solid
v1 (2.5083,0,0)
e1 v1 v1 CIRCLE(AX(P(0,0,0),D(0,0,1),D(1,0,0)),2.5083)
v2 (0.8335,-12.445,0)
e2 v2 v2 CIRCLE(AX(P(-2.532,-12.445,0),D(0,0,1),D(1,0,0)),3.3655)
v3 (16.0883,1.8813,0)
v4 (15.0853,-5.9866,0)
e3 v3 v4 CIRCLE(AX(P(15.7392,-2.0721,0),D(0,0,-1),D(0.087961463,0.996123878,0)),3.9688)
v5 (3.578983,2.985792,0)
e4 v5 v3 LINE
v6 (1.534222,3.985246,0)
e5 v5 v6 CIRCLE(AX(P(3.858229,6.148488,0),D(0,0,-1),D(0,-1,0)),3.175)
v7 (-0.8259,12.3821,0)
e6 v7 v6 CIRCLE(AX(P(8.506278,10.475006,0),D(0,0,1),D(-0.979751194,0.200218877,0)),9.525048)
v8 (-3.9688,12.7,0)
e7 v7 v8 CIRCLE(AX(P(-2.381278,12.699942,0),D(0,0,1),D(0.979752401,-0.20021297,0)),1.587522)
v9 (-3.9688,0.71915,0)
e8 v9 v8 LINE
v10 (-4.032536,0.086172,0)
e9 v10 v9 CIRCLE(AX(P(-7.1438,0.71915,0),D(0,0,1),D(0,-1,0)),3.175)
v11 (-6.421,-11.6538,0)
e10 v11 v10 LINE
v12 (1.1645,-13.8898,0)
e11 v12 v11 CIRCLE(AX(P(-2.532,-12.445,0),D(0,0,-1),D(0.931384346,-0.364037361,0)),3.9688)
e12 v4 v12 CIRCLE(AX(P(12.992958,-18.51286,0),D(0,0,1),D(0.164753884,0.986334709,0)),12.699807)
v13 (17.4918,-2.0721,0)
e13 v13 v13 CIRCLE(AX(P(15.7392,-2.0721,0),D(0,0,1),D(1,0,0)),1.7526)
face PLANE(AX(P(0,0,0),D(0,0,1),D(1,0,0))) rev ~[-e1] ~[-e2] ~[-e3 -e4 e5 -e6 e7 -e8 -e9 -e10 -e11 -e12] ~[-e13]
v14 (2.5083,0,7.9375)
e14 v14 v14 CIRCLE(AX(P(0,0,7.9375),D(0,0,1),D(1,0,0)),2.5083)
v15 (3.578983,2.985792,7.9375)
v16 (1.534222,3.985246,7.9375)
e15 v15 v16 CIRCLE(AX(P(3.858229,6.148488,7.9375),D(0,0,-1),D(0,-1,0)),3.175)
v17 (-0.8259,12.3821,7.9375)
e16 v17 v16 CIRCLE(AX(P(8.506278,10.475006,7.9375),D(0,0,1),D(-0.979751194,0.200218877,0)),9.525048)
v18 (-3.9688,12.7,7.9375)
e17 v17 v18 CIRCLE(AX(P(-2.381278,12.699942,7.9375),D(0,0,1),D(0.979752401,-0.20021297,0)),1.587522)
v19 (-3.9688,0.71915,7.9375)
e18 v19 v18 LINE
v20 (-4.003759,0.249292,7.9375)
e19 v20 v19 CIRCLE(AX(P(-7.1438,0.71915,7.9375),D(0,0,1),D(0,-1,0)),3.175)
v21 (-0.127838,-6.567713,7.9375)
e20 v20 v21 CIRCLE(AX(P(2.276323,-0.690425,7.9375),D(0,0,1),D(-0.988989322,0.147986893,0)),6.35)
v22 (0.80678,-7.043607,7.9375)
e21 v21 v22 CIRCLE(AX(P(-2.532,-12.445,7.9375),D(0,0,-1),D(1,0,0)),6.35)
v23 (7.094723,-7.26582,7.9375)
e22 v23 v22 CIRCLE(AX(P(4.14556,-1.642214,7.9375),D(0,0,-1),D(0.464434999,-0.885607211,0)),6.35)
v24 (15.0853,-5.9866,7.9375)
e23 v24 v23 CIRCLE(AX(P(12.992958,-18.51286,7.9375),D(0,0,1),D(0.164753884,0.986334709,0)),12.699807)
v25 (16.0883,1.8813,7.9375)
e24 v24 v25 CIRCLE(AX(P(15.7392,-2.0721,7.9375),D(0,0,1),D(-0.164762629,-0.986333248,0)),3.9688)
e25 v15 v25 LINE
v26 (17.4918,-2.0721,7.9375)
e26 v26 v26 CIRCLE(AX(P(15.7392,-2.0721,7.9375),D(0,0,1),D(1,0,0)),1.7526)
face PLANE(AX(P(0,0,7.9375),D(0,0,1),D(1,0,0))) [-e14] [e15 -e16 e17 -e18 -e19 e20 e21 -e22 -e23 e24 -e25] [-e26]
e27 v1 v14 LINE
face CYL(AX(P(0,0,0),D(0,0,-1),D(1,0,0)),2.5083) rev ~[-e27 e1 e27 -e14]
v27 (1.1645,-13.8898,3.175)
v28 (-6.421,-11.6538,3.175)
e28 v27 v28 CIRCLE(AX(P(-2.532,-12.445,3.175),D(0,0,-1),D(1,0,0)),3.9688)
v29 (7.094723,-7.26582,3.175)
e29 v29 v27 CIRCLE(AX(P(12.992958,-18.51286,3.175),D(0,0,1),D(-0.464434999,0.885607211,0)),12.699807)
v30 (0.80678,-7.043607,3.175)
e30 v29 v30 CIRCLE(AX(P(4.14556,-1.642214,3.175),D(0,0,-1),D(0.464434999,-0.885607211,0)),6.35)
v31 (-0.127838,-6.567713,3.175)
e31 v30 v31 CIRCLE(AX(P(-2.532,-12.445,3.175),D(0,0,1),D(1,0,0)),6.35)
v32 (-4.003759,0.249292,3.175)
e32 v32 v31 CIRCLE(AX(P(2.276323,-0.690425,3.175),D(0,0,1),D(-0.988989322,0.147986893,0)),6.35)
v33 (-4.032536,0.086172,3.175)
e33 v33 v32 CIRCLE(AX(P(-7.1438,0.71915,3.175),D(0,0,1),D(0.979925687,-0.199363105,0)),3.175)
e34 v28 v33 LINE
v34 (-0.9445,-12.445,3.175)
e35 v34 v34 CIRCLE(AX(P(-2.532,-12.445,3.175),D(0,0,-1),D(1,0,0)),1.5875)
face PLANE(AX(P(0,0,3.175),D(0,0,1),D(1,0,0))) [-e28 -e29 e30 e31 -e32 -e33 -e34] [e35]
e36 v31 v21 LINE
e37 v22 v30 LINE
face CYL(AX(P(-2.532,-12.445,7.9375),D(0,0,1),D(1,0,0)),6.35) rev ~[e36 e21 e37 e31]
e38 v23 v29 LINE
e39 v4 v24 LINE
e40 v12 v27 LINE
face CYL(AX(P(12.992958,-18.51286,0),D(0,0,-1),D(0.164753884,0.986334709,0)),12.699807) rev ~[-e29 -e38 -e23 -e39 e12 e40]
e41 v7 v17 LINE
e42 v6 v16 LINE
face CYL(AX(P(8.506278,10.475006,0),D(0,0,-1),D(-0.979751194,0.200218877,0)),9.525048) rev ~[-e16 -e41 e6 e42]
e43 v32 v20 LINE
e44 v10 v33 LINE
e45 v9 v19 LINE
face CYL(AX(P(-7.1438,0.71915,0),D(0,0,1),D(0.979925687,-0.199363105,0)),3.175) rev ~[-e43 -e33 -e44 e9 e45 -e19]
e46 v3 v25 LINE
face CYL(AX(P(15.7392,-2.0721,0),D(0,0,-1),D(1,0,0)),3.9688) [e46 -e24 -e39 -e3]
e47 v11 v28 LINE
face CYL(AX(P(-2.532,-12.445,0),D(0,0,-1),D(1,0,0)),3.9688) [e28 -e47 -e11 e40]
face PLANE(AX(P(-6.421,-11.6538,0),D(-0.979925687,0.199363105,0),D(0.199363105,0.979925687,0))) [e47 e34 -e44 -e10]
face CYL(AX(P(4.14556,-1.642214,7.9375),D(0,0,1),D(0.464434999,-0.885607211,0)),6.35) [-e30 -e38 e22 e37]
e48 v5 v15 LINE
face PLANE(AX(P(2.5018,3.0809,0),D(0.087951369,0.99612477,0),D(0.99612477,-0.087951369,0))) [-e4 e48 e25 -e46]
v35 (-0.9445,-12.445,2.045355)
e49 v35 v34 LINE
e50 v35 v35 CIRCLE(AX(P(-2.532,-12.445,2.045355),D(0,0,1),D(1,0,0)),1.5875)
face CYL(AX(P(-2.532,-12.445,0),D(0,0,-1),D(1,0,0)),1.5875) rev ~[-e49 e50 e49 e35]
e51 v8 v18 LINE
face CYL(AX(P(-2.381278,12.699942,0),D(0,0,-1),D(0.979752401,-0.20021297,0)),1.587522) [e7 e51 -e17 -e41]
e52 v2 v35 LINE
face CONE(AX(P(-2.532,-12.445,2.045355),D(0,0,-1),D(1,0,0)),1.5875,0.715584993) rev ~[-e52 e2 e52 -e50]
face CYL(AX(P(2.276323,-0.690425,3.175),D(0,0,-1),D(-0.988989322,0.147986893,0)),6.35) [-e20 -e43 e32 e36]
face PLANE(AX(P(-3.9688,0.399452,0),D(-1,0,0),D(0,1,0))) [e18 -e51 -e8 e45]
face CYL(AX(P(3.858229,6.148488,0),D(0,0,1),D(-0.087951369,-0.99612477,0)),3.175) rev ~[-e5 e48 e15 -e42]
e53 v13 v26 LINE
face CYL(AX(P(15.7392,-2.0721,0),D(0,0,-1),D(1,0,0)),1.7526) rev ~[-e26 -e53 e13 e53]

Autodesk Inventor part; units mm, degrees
ref_plane "YZ Plane" through (0, 0, 0) normal (1, 0, 0) x (0, 1, 0)
ref_plane "XZ Plane" through (0, 0, 0) normal (0, 1, 0) x (-1, 0, 0)
ref_plane "XY Plane" through (0, 0, 0) normal (0, 0, 1) x (1, 0, 0)
sketch "Sketch4" plane through (0, 0, 0) normal (0, 0, 1) x (1, 0, 0)
  circle A0 centre (0, 0) radius 2.5083
  circle A1 centre (0, 0) radius 3.9688
  line L0 (-3.9688, 0) -> (-3.9688, 12.7)
  arc A2 (-0.8259, 12.3821) -> (-3.9688, 12.7) centre (-2.3812, 12.7) ccw
  arc A3 (-0.8259, 12.3821) -> (2.5018, 3.0809) centre (8.5062, 10.475) ccw
  circle A4 centre (0, 0) radius 4.7625 construction
  circle A5 centre (15.7392, -2.0721) radius 6.35 construction
  circle A6 centre (15.7392, -2.0721) radius 3.9688
  circle A7 centre (15.7392, -2.0721) radius 1.7526
  line L1 (2.5018, 3.0809) -> (16.0883, 1.8813)
  circle A8 centre (-2.532, -12.445) radius 3.9688
  circle A9 centre (-2.532, -12.445) radius 1.5875
  line L2 (-6.421, -11.6538) -> (-3.8891, 0.7912)
  line L3 (17.6986, -5.5234) -> (-0.5726, -15.8964)
  line L4 (0, 0) -> (15.7392, -2.0721) construction
  line L5 (15.7392, -2.0721) -> (16.2572, 1.8627) construction
  line L6 (0, 4.7625) -> (0, 0) construction
  line L7 (-2.532, -12.445) -> (0, 0) construction
  line L8 (-2.532, -12.445) -> (-4.0876, -12.1285) construction
  circle A10 centre (-2.532, -12.445) radius 4.7625 construction
  arc A11 (15.0853, -5.9866) -> (1.1645, -13.8898) centre (12.993, -18.5131) ccw
  point P0 (3.9688, 0)
  point P1 (2.0561, -3.3946)
  dimension "d54" = 9.525
  dimension "d62" = 3.175
  dimension "d44" = 5.0165
  dimension "d45" = 7.9375
  dimension "d51" = 12.7
  dimension "d52" = 3.175
  dimension "d53" = 9.525
  dimension "d56" = 12.7
  dimension "d57" = 7.9375
  dimension "d58" = 3.5052
  dimension "d61" = 7.9375
  dimension "Lever_Offset" = 15.875
  dimension "Lever_Angle" = 97.5
  dimension "d72" = 191.5
  dimension "d73" = 12.7
  dimension "d74" = 9.525
  dimension "d75" = 25.4
extrude "Extrusion3" add sketch "Sketch4" along normal blind 7.9375 contours A1 | A1 L1 A6 A11 A8 L2 L0 | A1 L2 L0 A2 A3 | L0 L2 A1 | A6 | A8
fillet "Fillet5" radius 3.175 2 edges at (2.5018, 3.0809, 3.9688) (-3.9688, 0.3996, 3.9688)
sketch "Sketch5" plane through (0, 0, 7.9375) normal (0, 0, 1) x (1, 0, 0)
  arc A0 (15.0853, -5.9866) -> (16.0883, 1.8813) centre (15.7392, -2.0721) ccw projected
  arc A1 (-0.8259, 12.3821) -> (1.5343, 3.9852) centre (8.5062, 10.475) ccw projected
  arc A2 (-0.8259, 12.3821) -> (-3.9688, 12.7) centre (-2.3812, 12.7) ccw projected
  arc A3 (-6.421, -11.6538) -> (1.1645, -13.8898) centre (-2.532, -12.445) ccw projected
  circle A4 centre (-2.532, -12.445) radius 6.35
  circle A5 centre (0, 0) radius 3.9688
  circle A6 centre (15.7392, -2.0721) radius 6.4439
  line L0 (-4.0325, 0.0863) -> (-6.421, -11.6538) projected
  line L1 (16.0883, 1.8813) -> (3.579, 2.9858) projected
  arc A7 (1.5343, 3.9852) -> (3.579, 2.9858) centre (3.8582, 6.1485) ccw projected
  circle A8 centre (0, 0) radius 2.5083 projected
  line L2 (-3.9688, 12.7) -> (-3.9688, 0.7193) projected
  arc A9 (-4.0325, 0.0863) -> (-3.9688, 0.7193) centre (-7.1437, 0.7193) ccw projected
  arc A10 (15.0853, -5.9866) -> (1.1645, -13.8898) centre (12.993, -18.5131) ccw projected
  point P0 (-3.9688, 0)
  point P1 (15.0677, -4.2555)
  point P2 (12.7369, 2.861)
  point P3 (11.0312, 2.3278)
  point P4 (10.6542, -6.0303)
  dimension "d76" = 12.7
extrude "Extrusion4" cut sketch "Sketch5" against normal blind 4.7625 contours A10 A3 L0 A4 | A4 L0 A3 A10
chamfer "Chamfer2" distance 1.778 angle 49 1 edges at (-4.1195, -12.445, 0) measured on face at (8.6395, -2.6642, 0)
fillet "Fillet6" radius 6.35 2 edges at (-5.4328, -6.7963, 5.5563) (3.403, -10.1871, 5.5563)
properties part number "Lever" material "Aluminum 6061"
